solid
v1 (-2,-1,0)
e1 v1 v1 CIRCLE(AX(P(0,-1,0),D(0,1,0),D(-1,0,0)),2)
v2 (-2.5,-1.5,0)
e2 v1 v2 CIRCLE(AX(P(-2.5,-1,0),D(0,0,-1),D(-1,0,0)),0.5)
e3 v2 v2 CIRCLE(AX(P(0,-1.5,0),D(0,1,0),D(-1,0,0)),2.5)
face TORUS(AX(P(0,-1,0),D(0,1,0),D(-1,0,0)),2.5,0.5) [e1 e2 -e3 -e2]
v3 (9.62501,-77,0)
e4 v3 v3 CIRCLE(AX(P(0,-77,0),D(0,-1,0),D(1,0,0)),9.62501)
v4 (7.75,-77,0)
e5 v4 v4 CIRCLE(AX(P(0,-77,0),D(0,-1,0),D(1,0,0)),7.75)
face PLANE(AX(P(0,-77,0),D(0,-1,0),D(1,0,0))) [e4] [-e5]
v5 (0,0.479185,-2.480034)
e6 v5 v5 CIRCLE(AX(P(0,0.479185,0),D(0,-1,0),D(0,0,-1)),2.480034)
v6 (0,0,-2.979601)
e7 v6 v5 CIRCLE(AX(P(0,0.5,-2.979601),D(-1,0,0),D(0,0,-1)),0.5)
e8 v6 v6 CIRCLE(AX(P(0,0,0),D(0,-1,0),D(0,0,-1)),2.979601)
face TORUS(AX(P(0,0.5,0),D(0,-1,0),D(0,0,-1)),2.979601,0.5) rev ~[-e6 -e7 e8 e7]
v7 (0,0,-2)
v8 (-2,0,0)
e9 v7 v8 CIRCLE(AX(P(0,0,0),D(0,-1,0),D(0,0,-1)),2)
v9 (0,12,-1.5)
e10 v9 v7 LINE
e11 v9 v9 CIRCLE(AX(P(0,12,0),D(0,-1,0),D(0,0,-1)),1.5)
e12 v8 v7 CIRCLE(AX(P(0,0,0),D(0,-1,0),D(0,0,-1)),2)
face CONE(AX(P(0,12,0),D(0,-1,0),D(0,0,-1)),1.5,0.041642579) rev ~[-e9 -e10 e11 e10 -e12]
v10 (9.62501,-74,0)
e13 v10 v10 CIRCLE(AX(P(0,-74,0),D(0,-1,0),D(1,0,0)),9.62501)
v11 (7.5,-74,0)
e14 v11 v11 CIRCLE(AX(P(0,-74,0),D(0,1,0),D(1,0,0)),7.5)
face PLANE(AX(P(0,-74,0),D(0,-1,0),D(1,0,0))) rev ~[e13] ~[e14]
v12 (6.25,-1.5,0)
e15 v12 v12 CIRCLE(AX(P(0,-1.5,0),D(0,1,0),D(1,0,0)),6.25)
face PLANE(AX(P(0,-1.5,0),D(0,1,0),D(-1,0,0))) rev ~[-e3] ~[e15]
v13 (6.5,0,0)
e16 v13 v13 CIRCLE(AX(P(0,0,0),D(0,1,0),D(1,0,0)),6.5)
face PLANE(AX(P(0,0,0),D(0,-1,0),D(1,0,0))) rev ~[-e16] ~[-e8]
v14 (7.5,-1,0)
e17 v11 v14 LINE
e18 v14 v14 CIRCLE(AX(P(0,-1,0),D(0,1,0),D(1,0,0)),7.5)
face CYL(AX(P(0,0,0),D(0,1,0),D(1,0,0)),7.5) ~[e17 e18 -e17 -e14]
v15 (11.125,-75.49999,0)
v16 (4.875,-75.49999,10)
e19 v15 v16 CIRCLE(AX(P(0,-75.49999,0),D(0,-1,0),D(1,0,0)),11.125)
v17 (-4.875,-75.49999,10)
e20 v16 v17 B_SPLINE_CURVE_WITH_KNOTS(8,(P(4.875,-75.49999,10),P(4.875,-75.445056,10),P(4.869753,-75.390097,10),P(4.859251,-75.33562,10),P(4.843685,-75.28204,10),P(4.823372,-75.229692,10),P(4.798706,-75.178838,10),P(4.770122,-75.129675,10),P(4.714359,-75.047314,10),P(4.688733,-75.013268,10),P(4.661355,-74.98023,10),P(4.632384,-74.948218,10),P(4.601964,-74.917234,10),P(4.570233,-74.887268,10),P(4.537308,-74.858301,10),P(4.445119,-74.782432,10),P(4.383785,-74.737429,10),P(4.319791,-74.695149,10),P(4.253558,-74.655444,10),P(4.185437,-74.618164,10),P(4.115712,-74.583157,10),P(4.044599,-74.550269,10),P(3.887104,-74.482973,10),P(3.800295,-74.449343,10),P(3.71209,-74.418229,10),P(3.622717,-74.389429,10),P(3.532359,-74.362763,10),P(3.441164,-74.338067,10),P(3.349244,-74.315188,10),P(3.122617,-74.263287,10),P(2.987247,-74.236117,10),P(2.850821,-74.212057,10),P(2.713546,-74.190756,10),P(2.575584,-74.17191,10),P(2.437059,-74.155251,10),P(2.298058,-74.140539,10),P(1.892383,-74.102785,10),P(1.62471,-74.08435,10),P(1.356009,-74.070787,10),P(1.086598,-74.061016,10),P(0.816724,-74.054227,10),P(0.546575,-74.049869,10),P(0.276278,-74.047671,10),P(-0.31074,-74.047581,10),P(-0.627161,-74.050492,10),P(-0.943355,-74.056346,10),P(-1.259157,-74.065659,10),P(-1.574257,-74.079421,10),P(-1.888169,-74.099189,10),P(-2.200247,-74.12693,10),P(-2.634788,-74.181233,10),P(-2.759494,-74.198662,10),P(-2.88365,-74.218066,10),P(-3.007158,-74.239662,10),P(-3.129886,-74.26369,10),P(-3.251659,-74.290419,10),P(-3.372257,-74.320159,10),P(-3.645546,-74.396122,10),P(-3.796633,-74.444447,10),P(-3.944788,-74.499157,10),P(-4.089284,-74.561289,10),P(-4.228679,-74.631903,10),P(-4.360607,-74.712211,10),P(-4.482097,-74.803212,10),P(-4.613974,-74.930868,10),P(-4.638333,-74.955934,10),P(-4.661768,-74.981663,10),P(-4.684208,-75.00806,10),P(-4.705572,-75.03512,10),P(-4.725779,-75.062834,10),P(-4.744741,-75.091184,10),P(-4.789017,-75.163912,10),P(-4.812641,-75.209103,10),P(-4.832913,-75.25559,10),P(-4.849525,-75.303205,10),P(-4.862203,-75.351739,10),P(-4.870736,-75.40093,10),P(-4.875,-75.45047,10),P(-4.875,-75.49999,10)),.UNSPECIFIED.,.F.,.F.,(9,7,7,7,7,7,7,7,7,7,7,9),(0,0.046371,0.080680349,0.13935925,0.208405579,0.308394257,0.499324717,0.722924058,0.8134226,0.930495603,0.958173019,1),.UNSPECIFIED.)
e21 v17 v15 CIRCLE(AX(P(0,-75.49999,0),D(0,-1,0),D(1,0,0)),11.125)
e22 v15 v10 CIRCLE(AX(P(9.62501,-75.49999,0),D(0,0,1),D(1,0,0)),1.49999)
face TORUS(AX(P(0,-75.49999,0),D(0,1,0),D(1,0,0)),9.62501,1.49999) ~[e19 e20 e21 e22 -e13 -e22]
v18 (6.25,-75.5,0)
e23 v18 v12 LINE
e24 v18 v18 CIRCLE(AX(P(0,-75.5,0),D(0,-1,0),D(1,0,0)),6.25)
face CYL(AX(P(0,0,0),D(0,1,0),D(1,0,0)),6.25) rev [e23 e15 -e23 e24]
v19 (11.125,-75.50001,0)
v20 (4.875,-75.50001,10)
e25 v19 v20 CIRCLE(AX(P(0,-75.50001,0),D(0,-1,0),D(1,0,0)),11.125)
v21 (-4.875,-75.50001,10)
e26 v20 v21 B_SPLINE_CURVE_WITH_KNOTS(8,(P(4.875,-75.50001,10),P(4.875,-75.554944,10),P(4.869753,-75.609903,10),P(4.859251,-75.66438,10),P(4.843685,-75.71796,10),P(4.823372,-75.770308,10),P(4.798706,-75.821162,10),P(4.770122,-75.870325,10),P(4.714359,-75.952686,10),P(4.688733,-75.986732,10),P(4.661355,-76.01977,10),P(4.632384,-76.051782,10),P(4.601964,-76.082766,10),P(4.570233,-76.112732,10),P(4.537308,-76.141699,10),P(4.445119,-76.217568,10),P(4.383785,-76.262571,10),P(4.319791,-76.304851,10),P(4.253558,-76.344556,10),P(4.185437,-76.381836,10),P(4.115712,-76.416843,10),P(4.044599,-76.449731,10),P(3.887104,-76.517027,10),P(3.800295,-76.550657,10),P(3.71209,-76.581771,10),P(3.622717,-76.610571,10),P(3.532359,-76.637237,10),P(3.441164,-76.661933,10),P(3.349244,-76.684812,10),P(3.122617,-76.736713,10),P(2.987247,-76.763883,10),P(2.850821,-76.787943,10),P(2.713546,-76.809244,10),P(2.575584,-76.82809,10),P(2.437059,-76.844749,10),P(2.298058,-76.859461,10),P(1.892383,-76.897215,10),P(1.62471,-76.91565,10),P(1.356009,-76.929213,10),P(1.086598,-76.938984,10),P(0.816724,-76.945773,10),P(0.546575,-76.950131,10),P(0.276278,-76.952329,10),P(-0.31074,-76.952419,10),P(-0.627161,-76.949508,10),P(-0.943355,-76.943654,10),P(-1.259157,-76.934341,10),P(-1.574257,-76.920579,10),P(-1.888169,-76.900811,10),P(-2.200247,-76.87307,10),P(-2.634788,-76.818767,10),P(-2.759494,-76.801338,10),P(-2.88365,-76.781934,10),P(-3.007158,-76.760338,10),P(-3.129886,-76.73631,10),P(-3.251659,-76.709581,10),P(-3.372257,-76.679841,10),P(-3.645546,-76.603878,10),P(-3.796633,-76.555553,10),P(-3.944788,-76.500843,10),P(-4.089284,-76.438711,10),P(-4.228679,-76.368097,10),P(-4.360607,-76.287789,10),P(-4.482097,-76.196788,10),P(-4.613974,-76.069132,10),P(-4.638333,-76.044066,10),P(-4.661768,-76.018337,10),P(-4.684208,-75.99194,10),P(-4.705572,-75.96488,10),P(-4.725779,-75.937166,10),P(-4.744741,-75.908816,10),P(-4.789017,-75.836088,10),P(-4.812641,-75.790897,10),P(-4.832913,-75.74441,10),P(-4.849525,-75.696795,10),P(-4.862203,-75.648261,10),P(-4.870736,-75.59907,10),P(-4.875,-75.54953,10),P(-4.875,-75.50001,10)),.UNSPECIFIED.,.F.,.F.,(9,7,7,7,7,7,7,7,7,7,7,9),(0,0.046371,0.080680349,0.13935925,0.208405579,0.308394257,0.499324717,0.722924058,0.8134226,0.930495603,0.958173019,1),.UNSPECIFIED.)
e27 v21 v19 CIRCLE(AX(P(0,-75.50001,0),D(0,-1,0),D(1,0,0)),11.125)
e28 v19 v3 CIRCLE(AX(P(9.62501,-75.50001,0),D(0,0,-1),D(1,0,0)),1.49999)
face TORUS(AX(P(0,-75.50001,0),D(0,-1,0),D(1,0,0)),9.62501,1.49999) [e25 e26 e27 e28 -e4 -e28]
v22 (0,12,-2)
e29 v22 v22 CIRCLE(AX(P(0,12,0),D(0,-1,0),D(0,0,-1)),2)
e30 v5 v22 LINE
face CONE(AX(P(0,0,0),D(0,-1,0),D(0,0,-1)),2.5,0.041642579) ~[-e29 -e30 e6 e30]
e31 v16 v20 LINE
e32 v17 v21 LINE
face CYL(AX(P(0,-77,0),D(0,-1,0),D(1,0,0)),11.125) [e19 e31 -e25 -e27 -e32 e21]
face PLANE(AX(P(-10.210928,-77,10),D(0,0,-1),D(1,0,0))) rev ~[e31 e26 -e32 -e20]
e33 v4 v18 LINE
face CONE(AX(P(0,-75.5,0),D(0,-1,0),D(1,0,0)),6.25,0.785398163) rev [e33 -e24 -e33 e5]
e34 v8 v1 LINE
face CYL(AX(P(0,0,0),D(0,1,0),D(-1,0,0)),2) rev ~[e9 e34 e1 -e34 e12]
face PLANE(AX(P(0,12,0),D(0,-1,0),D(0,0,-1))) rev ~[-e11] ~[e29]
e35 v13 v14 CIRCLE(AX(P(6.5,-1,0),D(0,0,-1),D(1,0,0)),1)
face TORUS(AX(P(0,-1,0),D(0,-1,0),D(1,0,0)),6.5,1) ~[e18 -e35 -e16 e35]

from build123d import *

# Parameters (mm, degrees)
F0_R      = 7.5
F0_R_2    = 6.25
F1_DEPTH  = 77
F2_R      = 11.125
F2_R_2    = 7.5
F2_R_3    = 6.25
F3_DEPTH  = 3
F4_R      = 1.49999
F6_DEPTH  = 25
F7_SIZE   = 1.5
F8_R      = 7.5
F9_DEPTH  = 1.5
F10_R     = 1
F13_R     = 0.5
F14_R     = 2
F15_DEPTH = 25
F16_R     = 0.5


# Not quite as in the source:
# - a fillet or chamfer is up to 0.001 mm smaller than in the source, because OpenCascade refuses the exact size


with BuildPart() as f1:
    # F0 (on Front) → F1 (new body)
    with BuildSketch(Plane.XZ):
        Circle(F0_R)
        Circle(F0_R_2, mode=Mode.SUBTRACT)
    extrude(amount=F1_DEPTH)

    # F2 (on face) → F3 (join)
    with BuildSketch(Plane.XZ.offset(77)):
        Circle(F2_R)
        Circle(F2_R_2, mode=Mode.SUBTRACT)
        Circle(F2_R_2)
        Circle(F2_R_3, mode=Mode.SUBTRACT)
    extrude(amount=-F3_DEPTH)

    # F4 (radius 1.5 in the source; OpenCascade refuses exactly that, so slightly less here)
    f4_edges = [f1.edges().sort_by_distance(p)[0] for p in [
        (-11.125, -77, 0),
        (-11.125, -74, 0),
    ]]
    fillet(f4_edges, radius=F4_R)

    # F5 (on face) → F6 (cut)
    with BuildSketch(Plane.XZ.offset(77)):
        Polygon((-7.5801494531, 15.4223963618), (-10.2109283504, 10), (17.5064372194, 10), (14.5523855463, 16.5495146066), align=None)
    extrude(amount=-F6_DEPTH, mode=Mode.SUBTRACT)

    # F7
    f7_edges = [f1.edges().sort_by_distance(p)[0] for p in [
        (-6.25, -77, 0),
    ]]
    chamfer(f7_edges, length=F7_SIZE)

    # F8 (on face) → F9 (join)
    with BuildSketch(Plane(origin=(0, 0, 0), x_dir=(-1, 0, 0), z_dir=(0, 1, 0))):
        Circle(F8_R)
    extrude(amount=-F9_DEPTH)

    # F10
    f10_edges = [f1.edges().sort_by_distance(p)[0] for p in [
        (-7.5, 0, 0),
    ]]
    fillet(f10_edges, radius=F10_R)

    # F11 (on Right) → F12 (revolve)
    with BuildSketch(Plane.YZ):
        Polygon((0, -2), (0, -2.5), (12, -2), (12, -1.5), align=None)
    revolve(axis=Axis((0, 5.0854310393, 0), (0, -1, 0)))

    # F13
    f13_edges = [f1.edges().sort_by_distance(p)[0] for p in [
        (0, 0, 2.5),
    ]]
    fillet(f13_edges, radius=F13_R)

    # F14 (on face) → F15 (cut)
    with BuildSketch(Plane(origin=(0, 0, 0), x_dir=(-1, 0, 0), z_dir=(0, 1, 0))):
        Circle(F14_R)
    extrude(amount=-F15_DEPTH, mode=Mode.SUBTRACT)

    # F16
    f16_edges = [f1.edges().sort_by_distance(p)[0] for p in [
        (2, -1.5, 0),
    ]]
    fillet(f16_edges, radius=F16_R)


solid = f1.part
